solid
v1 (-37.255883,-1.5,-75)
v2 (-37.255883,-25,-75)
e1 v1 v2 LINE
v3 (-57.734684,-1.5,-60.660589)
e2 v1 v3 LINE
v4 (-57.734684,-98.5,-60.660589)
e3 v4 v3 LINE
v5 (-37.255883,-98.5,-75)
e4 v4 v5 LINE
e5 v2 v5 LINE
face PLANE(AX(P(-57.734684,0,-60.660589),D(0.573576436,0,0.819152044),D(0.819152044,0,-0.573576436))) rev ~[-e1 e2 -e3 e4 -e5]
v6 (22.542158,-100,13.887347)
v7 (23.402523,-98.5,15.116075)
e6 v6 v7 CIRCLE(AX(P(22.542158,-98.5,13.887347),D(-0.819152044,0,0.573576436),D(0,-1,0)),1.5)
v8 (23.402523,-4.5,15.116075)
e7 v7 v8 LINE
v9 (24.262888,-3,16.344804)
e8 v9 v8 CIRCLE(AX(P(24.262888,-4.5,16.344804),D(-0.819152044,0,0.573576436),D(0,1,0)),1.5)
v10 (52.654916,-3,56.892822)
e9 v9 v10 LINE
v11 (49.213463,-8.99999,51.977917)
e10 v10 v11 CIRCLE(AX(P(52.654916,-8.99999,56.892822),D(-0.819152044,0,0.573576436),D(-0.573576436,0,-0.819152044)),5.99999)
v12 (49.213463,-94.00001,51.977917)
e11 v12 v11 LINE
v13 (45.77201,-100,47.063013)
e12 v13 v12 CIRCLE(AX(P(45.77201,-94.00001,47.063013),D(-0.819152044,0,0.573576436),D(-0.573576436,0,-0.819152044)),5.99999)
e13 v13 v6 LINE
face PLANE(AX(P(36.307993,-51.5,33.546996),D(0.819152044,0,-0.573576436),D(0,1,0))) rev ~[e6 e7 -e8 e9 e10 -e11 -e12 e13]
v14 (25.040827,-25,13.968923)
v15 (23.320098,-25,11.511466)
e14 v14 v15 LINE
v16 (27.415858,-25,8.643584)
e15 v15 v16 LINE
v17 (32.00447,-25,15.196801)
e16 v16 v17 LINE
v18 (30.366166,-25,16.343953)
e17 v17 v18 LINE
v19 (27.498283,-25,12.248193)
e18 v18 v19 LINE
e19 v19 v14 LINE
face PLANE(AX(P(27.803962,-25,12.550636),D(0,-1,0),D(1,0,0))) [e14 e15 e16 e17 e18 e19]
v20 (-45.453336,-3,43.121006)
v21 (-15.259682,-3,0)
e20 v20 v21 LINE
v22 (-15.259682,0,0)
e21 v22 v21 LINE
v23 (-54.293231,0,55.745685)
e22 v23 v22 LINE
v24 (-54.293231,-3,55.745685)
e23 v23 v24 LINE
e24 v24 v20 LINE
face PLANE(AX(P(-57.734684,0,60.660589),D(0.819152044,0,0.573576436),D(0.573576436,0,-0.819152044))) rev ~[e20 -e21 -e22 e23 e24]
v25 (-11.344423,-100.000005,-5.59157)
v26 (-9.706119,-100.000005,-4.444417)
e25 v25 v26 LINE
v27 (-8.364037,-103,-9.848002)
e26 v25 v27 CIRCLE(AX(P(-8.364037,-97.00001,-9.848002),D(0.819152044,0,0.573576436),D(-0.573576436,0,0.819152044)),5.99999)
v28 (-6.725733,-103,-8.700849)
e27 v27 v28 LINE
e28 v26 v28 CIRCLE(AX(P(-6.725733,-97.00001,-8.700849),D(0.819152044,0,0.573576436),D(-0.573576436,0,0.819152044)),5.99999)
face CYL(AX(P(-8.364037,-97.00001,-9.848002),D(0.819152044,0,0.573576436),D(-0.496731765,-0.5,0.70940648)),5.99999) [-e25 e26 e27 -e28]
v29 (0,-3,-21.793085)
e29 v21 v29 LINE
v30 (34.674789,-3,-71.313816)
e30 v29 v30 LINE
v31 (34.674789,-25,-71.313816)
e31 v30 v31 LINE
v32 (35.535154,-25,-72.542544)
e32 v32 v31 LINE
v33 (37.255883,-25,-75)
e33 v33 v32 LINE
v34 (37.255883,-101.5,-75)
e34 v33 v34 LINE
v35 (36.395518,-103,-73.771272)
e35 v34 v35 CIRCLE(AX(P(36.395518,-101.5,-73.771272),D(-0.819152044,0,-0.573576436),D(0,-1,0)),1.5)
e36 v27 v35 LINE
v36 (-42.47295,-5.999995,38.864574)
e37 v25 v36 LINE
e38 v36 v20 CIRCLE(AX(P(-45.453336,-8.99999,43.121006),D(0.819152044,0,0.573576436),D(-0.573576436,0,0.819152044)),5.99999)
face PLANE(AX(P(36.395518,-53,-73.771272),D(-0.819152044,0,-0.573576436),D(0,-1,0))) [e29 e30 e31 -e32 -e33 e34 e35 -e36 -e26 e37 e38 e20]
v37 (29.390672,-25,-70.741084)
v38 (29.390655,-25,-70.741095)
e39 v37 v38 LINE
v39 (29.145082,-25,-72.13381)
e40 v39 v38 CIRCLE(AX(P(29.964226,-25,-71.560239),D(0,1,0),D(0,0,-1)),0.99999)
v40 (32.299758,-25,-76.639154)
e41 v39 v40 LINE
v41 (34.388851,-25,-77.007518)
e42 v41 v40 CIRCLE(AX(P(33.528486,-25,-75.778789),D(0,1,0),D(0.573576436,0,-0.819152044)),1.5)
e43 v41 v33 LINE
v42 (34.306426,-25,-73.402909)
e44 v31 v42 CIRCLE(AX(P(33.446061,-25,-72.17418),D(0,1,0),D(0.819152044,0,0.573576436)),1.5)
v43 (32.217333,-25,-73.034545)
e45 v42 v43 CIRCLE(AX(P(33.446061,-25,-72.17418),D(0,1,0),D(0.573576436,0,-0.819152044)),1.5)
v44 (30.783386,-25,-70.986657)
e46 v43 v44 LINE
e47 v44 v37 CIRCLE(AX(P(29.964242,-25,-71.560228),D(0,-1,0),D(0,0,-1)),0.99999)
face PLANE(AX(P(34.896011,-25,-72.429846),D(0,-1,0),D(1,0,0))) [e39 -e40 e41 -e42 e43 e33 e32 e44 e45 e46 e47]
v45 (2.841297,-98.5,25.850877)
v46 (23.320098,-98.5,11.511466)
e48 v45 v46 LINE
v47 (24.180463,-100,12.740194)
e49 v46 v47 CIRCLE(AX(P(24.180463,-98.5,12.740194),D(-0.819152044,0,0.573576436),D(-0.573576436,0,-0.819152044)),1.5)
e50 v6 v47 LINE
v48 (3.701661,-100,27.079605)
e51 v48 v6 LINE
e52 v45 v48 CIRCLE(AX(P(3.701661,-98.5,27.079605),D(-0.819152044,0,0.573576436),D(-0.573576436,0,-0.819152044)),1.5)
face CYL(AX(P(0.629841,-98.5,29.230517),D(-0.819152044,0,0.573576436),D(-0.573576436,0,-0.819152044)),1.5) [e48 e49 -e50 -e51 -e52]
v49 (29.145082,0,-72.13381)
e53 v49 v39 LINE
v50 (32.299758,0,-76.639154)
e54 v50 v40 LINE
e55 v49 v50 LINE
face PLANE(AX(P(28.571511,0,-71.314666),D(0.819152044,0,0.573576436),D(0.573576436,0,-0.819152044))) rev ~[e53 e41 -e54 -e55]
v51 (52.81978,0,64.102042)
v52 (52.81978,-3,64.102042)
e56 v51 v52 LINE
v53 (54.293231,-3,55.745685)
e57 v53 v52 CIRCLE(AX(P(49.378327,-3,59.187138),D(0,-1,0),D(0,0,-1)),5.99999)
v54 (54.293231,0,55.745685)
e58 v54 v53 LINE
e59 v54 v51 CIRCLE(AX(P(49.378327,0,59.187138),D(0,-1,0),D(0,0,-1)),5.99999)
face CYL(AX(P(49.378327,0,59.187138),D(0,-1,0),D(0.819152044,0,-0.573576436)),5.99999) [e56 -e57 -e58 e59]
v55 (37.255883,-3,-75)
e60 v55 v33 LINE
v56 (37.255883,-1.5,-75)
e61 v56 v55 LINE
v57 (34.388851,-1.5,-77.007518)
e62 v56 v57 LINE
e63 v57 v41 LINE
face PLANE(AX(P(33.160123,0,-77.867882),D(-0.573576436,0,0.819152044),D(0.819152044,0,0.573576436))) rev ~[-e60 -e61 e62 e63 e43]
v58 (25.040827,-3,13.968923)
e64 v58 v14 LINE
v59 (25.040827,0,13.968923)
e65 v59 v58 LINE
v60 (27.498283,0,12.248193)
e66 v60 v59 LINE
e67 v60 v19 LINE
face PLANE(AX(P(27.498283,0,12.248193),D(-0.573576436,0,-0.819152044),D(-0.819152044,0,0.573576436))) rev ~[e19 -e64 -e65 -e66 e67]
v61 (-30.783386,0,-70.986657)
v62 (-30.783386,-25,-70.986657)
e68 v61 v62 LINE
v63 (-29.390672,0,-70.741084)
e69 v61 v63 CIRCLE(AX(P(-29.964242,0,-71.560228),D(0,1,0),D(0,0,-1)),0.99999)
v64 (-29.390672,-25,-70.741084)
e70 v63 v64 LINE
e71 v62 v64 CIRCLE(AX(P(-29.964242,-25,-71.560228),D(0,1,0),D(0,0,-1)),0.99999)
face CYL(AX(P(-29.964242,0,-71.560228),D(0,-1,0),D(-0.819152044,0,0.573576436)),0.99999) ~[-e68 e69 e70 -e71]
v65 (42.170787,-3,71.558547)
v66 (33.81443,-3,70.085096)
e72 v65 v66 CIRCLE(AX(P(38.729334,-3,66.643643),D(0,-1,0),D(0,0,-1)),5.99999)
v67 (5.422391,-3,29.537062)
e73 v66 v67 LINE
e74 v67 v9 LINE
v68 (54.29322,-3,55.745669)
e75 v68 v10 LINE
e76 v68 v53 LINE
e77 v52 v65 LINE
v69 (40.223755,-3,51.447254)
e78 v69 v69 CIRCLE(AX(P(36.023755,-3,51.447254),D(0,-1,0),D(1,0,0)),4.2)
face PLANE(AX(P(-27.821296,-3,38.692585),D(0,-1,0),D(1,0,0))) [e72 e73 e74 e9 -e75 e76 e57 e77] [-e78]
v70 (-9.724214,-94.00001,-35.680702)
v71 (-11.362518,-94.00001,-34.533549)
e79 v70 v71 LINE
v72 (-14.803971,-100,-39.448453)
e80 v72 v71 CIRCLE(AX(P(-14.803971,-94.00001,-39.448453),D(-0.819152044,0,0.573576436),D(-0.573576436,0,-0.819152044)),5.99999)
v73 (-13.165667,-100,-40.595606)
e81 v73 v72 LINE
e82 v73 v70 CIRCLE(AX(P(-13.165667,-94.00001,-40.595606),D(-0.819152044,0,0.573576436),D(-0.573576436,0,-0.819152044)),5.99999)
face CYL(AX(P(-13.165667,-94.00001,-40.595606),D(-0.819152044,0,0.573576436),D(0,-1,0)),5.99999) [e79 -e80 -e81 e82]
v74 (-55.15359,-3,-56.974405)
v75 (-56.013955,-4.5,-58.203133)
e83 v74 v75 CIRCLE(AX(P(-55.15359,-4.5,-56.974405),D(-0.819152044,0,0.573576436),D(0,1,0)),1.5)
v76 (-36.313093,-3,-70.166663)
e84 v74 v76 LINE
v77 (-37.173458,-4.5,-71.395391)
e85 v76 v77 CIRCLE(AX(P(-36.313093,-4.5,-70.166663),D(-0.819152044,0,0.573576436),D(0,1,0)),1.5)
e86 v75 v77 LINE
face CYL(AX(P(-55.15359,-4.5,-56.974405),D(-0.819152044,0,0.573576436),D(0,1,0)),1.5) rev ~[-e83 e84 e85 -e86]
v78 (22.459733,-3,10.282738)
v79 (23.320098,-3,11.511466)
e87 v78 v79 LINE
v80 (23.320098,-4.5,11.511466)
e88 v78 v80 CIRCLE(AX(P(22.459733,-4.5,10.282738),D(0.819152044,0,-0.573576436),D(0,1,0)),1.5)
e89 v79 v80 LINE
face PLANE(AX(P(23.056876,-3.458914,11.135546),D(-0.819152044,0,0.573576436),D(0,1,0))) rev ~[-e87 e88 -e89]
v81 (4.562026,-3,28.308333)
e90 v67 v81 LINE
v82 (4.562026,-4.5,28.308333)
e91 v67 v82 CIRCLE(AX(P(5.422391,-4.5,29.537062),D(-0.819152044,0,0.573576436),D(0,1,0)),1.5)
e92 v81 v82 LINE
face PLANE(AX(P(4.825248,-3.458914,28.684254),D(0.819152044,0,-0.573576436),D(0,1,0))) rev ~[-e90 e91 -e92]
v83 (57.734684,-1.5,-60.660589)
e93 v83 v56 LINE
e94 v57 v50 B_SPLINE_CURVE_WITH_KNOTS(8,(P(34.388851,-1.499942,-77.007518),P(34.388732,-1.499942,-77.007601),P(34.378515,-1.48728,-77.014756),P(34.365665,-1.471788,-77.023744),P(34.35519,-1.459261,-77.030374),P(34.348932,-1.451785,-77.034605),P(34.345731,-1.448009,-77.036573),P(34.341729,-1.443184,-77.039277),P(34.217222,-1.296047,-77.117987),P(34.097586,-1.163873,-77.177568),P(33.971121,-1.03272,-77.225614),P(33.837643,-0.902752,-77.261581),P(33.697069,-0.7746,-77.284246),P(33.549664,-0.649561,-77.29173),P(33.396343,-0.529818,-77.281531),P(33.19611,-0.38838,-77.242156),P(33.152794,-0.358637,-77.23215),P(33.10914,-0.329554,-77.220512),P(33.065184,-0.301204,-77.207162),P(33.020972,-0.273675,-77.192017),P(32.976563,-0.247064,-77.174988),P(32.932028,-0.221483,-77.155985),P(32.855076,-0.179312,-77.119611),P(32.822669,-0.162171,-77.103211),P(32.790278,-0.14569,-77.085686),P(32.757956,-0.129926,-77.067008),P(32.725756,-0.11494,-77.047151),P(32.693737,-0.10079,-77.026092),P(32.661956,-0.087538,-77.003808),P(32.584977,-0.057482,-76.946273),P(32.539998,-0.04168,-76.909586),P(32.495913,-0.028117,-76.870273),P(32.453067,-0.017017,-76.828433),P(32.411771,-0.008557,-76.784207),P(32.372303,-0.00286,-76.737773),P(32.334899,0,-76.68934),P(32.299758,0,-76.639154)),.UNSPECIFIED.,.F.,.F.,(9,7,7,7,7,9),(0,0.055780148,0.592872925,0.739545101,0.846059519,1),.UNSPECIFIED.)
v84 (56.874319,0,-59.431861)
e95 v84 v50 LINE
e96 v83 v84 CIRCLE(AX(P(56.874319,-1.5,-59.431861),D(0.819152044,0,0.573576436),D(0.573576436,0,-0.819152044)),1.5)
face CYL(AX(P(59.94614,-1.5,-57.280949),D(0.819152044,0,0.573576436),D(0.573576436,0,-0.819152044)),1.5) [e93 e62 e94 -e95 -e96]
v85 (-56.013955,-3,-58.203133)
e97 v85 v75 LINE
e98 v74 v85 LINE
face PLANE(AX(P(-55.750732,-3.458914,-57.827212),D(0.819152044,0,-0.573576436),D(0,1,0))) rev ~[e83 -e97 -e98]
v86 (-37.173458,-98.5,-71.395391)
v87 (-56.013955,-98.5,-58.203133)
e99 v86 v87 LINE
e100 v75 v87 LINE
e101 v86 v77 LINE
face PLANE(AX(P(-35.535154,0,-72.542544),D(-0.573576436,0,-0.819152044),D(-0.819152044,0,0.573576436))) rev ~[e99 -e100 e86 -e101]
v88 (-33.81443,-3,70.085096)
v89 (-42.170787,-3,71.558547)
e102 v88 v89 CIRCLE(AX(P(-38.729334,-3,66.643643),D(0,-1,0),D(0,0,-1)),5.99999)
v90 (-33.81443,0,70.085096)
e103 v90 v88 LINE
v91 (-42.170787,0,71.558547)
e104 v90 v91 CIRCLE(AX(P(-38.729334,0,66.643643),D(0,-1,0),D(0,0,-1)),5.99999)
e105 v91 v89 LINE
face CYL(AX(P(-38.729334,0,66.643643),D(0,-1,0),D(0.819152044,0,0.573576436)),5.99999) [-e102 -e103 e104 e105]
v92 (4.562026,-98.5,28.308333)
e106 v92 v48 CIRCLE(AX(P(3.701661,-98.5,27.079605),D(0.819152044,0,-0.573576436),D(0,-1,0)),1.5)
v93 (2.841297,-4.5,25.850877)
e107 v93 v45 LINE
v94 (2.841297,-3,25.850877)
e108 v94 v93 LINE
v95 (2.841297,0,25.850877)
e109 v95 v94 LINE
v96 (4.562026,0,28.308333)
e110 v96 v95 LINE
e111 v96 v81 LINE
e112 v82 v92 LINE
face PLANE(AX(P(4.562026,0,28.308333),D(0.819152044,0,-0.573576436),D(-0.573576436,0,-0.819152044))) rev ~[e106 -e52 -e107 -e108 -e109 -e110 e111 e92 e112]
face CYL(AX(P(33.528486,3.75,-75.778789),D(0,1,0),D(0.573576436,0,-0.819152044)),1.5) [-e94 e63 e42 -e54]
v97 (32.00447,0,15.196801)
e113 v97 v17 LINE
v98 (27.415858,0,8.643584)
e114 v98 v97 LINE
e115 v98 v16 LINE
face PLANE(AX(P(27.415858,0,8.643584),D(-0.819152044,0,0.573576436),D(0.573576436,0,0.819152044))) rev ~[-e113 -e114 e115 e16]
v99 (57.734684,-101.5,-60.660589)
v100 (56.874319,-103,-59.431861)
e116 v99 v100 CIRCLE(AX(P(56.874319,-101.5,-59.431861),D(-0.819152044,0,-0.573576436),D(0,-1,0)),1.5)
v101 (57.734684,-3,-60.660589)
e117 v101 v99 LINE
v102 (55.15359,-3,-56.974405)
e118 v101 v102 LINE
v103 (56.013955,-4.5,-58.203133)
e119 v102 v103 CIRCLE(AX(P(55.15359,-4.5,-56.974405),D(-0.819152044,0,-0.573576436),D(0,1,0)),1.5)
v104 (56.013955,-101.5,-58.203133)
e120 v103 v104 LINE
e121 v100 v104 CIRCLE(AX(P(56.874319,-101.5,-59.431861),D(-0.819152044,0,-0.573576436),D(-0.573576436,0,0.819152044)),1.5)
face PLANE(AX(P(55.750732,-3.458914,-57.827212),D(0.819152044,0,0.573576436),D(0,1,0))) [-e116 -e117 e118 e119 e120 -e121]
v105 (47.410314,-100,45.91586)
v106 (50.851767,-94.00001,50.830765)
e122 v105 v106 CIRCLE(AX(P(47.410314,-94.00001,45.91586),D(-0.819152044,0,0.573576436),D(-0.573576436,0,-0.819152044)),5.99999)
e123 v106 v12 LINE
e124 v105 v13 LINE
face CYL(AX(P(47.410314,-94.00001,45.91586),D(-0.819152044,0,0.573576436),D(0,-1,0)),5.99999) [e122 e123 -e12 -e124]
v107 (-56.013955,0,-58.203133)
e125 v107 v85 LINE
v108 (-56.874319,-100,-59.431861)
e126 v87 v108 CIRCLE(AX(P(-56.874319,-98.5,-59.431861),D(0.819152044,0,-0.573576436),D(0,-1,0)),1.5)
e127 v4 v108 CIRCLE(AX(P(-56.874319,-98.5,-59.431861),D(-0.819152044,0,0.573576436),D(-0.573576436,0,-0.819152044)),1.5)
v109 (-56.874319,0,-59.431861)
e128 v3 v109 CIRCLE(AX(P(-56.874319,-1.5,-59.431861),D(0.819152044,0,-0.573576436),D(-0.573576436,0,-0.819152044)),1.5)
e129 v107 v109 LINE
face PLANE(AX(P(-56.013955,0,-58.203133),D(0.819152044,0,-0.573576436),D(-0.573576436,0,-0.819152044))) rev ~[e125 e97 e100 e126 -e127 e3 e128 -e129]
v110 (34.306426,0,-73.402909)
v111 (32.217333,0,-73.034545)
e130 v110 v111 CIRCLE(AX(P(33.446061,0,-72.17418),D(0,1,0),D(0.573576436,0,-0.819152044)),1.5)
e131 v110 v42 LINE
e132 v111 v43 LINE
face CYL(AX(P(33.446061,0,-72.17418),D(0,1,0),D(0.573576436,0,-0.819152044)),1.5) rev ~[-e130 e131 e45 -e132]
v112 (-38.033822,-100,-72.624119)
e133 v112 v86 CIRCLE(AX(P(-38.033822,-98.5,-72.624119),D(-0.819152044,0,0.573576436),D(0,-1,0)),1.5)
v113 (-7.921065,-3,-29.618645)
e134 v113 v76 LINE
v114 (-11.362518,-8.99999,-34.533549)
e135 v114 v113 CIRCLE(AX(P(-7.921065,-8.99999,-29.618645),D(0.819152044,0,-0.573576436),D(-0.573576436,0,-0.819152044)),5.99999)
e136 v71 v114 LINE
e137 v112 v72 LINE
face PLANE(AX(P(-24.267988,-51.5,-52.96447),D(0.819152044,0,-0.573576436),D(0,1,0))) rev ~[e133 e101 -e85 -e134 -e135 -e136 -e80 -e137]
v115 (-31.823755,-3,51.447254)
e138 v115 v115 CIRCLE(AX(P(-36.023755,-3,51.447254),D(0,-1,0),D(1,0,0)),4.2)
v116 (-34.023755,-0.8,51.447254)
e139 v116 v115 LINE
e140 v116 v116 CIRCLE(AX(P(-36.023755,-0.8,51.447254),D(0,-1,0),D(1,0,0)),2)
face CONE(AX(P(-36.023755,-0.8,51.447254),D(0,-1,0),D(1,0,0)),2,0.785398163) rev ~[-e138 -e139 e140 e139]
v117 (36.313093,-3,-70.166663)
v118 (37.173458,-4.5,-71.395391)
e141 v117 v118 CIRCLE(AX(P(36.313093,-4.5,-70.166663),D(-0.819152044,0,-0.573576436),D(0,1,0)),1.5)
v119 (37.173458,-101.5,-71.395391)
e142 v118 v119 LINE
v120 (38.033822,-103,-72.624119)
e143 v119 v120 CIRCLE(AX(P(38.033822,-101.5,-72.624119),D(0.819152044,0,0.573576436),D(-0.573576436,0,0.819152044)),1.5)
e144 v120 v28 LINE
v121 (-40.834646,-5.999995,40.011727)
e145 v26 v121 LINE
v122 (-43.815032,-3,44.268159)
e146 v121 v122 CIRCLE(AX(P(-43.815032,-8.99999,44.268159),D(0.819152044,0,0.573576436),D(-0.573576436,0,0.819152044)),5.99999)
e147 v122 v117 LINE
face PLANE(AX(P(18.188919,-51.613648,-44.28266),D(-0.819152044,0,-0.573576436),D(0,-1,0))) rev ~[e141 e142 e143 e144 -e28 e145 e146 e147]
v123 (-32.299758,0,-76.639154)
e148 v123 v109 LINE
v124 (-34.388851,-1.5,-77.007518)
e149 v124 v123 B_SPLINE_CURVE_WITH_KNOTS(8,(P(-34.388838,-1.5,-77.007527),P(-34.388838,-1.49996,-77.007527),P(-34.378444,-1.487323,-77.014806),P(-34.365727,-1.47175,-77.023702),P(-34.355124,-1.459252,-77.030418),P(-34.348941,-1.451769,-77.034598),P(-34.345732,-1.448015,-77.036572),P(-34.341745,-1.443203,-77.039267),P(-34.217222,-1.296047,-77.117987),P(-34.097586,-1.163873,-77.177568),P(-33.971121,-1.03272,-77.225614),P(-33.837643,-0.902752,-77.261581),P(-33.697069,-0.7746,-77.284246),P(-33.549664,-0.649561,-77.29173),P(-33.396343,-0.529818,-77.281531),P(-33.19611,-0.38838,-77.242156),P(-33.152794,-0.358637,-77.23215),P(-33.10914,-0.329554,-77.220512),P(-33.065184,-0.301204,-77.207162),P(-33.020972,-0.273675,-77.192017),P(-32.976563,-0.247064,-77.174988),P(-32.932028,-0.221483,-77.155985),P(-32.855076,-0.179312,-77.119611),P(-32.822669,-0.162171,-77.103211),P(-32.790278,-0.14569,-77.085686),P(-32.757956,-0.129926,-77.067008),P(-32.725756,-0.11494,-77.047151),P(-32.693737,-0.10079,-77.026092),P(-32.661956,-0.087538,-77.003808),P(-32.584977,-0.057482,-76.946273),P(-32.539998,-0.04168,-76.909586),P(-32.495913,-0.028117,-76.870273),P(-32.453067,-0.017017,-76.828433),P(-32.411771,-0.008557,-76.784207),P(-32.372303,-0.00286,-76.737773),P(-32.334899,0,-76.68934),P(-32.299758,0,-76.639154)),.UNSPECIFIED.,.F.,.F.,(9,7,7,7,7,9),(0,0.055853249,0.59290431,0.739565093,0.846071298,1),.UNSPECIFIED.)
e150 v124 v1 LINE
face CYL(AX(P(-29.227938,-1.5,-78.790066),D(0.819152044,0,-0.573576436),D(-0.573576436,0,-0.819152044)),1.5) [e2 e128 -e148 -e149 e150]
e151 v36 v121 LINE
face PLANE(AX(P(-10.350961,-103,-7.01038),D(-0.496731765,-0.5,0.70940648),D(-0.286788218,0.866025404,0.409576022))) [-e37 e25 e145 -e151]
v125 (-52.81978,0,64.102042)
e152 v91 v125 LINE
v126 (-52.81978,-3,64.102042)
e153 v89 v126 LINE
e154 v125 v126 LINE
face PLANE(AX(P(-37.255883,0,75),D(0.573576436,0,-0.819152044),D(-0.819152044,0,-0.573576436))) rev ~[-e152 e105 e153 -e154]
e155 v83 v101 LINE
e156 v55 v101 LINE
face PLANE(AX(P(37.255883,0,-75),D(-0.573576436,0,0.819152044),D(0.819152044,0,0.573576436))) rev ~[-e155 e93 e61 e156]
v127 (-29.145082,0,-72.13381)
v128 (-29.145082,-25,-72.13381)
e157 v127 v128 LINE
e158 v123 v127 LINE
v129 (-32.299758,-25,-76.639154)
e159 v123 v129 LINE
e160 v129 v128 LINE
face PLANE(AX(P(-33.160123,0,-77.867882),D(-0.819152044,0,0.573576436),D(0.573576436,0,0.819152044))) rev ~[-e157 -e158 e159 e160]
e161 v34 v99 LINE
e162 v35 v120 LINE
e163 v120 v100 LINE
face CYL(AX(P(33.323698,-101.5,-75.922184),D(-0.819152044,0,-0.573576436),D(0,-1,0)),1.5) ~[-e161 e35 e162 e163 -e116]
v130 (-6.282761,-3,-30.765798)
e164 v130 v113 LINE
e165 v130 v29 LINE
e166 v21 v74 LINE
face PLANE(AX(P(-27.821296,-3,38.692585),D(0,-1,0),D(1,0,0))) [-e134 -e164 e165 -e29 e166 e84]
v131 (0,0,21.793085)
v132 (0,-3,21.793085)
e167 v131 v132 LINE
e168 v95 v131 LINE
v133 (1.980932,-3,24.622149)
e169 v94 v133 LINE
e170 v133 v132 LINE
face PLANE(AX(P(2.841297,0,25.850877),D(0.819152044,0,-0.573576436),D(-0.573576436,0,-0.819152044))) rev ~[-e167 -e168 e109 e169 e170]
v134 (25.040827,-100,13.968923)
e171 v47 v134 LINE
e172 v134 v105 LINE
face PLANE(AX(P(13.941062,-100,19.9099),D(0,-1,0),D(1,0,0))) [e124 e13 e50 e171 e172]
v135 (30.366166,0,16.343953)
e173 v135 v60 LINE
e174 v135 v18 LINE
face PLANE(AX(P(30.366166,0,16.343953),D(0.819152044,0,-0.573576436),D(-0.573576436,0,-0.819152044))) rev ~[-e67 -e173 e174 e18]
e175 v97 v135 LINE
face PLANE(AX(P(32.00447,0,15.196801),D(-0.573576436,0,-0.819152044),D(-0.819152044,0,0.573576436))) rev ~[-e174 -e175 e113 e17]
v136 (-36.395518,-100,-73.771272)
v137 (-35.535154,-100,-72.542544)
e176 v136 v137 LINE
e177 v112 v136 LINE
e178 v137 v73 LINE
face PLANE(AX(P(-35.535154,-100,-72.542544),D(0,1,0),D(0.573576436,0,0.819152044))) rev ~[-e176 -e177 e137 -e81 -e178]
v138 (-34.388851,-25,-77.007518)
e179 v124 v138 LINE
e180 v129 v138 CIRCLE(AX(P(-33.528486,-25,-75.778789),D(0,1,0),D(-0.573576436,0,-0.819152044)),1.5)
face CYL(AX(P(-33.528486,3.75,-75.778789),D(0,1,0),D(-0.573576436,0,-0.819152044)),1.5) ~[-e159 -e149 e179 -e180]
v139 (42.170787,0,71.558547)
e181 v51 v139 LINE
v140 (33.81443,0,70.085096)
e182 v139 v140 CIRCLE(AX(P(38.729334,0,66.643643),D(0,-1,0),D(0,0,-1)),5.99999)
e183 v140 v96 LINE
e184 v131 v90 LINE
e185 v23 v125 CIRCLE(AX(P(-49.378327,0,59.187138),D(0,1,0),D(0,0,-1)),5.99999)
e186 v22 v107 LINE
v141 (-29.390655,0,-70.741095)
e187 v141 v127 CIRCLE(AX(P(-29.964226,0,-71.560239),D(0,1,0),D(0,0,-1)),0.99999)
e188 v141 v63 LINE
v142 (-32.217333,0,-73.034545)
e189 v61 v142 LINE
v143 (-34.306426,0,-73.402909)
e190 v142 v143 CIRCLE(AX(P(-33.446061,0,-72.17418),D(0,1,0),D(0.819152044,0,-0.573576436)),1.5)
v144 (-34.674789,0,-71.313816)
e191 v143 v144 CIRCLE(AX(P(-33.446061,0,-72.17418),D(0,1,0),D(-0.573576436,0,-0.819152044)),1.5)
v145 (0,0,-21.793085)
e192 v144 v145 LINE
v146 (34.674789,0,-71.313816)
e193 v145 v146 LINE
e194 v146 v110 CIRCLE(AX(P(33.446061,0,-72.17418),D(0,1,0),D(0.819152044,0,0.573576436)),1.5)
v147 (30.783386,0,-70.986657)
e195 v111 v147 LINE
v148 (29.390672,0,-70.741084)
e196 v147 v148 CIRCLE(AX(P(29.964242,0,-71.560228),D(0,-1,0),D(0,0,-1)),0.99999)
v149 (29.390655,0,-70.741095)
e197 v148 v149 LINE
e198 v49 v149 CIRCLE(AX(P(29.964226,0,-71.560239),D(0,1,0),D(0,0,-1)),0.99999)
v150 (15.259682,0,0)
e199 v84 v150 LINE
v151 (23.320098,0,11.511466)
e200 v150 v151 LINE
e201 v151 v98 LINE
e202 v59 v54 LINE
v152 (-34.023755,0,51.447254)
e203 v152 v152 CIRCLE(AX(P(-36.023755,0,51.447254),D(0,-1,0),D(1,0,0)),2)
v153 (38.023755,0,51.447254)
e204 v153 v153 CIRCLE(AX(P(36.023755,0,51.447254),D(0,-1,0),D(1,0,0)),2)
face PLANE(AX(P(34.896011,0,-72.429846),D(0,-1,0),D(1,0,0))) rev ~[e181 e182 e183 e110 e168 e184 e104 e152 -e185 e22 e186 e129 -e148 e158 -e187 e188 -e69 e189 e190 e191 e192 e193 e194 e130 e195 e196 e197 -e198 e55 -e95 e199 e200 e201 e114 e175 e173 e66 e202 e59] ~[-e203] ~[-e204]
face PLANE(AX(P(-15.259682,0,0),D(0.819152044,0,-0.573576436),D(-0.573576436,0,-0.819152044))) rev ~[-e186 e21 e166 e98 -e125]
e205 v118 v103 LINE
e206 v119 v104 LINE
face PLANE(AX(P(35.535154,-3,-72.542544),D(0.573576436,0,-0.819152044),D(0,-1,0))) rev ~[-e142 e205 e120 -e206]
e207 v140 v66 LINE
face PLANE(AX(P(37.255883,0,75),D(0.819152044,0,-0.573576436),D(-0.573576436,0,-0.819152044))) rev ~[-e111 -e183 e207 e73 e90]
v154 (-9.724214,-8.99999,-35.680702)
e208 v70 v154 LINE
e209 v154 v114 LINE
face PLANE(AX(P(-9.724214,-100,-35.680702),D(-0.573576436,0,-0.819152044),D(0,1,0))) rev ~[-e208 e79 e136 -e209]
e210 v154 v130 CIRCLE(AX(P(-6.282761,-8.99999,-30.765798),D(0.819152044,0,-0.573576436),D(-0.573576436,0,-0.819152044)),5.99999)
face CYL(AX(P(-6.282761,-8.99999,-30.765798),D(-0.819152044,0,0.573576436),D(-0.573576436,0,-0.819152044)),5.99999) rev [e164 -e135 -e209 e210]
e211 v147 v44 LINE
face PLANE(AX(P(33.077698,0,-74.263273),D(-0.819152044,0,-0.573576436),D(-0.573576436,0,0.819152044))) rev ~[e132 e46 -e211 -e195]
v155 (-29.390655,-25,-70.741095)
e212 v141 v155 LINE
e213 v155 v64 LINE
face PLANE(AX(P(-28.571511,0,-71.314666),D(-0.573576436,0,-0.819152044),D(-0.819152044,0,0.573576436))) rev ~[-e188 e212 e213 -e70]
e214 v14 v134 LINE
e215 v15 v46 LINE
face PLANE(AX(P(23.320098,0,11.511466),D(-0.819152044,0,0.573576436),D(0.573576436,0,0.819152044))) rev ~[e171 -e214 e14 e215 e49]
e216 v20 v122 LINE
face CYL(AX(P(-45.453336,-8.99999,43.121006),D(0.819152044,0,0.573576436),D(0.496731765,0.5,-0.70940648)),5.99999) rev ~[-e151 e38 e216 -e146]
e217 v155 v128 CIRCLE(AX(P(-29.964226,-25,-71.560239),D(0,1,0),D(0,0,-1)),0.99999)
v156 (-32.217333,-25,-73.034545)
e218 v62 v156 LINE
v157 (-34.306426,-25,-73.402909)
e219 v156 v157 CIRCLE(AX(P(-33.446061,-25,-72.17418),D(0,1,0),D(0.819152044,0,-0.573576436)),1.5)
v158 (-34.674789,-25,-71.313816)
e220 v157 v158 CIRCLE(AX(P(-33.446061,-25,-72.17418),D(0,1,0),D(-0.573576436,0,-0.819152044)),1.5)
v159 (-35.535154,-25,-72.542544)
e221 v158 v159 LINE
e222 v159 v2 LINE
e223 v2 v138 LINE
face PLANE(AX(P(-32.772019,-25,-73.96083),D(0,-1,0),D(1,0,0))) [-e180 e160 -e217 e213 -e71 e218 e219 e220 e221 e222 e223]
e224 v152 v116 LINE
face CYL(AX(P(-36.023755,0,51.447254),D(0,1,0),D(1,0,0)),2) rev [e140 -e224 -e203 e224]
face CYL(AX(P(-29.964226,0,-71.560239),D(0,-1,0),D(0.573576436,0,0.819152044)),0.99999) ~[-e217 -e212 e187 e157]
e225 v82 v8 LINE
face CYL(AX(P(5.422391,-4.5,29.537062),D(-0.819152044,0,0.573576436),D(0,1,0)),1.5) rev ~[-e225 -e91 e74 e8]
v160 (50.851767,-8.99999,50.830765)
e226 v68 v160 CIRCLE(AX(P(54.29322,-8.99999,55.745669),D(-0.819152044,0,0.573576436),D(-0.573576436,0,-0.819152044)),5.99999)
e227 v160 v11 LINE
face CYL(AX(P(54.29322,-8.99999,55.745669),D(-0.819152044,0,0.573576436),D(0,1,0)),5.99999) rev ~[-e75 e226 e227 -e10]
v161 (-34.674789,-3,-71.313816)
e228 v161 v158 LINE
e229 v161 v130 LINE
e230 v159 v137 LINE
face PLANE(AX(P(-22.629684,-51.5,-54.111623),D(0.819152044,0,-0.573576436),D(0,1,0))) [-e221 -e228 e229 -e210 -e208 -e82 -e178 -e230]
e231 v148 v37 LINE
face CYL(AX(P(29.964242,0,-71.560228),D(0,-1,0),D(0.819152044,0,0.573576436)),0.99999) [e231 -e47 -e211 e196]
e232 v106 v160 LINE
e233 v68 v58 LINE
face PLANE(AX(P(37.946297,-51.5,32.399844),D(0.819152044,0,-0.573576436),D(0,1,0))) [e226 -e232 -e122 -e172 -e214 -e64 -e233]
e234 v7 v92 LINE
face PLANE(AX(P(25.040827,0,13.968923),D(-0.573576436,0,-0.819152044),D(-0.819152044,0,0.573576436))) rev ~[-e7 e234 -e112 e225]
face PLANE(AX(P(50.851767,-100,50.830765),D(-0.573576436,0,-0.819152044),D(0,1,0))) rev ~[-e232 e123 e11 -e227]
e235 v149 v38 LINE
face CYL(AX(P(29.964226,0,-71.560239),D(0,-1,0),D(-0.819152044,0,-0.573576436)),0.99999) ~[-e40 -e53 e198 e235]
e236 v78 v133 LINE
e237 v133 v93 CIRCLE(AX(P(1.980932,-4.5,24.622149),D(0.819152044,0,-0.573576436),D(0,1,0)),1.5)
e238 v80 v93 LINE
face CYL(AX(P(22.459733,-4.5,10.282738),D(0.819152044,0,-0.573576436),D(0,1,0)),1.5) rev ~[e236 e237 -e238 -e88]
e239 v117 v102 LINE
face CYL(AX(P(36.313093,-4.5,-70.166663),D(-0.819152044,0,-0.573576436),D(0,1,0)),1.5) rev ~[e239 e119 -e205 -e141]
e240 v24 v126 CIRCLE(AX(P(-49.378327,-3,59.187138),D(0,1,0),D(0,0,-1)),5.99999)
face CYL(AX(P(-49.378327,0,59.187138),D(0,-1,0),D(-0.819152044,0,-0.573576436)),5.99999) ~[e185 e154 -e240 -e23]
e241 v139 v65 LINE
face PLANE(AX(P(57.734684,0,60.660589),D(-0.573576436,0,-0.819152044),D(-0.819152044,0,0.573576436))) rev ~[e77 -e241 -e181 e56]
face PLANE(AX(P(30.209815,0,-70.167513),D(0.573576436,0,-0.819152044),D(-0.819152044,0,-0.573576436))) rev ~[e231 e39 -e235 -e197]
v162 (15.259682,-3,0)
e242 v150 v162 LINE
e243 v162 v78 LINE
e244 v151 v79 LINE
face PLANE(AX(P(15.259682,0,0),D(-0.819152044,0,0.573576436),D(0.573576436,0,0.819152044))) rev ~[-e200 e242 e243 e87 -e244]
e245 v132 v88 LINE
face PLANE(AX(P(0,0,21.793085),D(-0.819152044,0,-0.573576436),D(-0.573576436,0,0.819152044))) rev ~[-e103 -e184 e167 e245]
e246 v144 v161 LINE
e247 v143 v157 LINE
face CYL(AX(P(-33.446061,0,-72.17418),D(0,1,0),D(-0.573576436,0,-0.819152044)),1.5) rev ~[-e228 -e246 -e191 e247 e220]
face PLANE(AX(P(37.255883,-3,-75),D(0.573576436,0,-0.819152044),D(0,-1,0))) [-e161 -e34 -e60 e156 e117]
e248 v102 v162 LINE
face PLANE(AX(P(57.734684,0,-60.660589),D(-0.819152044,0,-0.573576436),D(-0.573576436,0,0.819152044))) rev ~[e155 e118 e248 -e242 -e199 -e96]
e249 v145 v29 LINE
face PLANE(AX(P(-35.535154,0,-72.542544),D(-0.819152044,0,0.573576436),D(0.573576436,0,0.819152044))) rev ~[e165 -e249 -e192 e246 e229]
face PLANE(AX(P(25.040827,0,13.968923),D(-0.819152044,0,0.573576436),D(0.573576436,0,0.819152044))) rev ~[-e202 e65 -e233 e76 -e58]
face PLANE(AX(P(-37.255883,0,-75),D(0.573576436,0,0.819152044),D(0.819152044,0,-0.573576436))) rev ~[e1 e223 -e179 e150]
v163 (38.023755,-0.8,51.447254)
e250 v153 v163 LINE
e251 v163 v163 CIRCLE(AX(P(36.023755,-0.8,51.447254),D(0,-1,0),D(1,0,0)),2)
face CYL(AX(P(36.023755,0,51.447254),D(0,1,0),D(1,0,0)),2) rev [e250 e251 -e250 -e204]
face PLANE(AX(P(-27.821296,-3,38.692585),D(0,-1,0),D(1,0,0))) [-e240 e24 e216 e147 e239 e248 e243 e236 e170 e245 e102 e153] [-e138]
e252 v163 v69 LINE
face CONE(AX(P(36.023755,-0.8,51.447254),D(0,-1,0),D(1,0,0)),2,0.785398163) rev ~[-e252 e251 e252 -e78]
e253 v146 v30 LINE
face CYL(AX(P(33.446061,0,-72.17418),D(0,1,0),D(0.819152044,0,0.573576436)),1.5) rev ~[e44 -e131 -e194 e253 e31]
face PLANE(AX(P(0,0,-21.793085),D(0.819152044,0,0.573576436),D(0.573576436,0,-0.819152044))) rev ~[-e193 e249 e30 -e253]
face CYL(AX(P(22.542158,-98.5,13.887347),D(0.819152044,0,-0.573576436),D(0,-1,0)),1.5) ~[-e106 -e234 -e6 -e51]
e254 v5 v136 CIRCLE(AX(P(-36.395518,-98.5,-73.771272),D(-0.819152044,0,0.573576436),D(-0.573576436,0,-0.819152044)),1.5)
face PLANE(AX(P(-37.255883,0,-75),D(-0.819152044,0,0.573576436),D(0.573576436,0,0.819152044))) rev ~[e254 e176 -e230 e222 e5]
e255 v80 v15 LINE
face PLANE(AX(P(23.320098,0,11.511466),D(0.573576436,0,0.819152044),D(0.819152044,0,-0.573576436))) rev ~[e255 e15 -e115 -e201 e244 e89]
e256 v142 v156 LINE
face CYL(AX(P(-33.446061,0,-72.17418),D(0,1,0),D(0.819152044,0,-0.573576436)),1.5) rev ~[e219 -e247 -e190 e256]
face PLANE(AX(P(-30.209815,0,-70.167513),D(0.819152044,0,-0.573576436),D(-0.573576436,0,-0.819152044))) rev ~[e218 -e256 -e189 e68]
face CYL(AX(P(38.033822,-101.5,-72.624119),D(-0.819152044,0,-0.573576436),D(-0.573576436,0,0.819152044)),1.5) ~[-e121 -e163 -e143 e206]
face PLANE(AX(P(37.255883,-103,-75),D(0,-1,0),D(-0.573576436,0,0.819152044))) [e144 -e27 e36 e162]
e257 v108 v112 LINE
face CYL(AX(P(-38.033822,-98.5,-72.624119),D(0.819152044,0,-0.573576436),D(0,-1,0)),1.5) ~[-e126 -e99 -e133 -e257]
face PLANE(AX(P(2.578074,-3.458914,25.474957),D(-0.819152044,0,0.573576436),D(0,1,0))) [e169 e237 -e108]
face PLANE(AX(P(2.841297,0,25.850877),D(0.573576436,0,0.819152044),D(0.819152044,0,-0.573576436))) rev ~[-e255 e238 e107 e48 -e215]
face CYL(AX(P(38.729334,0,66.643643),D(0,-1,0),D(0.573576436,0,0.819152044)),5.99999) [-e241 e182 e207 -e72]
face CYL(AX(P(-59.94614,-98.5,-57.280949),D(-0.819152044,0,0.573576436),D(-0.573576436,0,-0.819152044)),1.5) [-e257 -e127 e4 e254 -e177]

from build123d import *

# Parameters (mm, degrees)
F0_R          = 2
F1_DEPTH      = 3
F4_DEPTH      = 2
F3_W          = 100
F3_H          = 3
F5_DEPTH      = 25
F6_DEPTH      = 25
F7_DEPTH      = 100
F9_W          = 97
F9_H          = 45
F10_DEPTH     = 2
F11_R         = 5.99999
F12_T1_DEPTH  = 23
F12_T3_DEPTH  = 25
F12_T5_DEPTH  = 23
F12_T7_DEPTH  = 25
F12_T9_DEPTH  = 32.5
F12_T11_DEPTH = 26.75
F12_T13_DEPTH = 32.5
F12_T15_DEPTH = 26.75
F12_T17_DEPTH = 37.5
F12_T19_DEPTH = 37.5
F12_T21_DEPTH = 32.5
F13_R         = 0.99999
F14_SIZE      = 2.2


# Not quite as in the source:
# - a fillet or chamfer that OpenCascade refuses, or shapes differently, is made with other operations: its cross-section is extruded or revolved along the edge and cut away or added
# - a fillet or chamfer is up to 0.001 mm smaller than in the source, because OpenCascade refuses the exact size
# - a feature names something its author has since deleted; it is built from what else it names


with BuildPart() as f1:
    # F0 (on Front) → F1 (new body)
    with BuildSketch(Plane.XZ):
        Polygon((-15.2596823595, 0), (0, 21.7930849453), (-37.2558830062, 75), (-57.7346841134, 60.6605890912), align=None)
        with Locations((-36.0237548328, 51.4472536598)):
            Circle(F0_R, mode=Mode.SUBTRACT)
        Polygon((0, -21.7930849453), (15.2596823595, 0), (0, 21.7930849453), (-15.2596823595, 0), align=None)
        Polygon((25.0408272414, 13.9689225668), (57.7346841134, 60.6605890912), (37.2558830062, 75), (4.5620261342, 28.3083334755), align=None)
        with Locations((36.0237548328, 51.4472536598)):
            Circle(F0_R, mode=Mode.SUBTRACT)
        Polygon((15.2596823595, 0), (23.3200979324, 11.5114664339), (2.8412968251, 25.8508773427), (0, 21.7930849453), align=None)
        Polygon((23.3200979324, 11.5114664339), (25.0408272414, 13.9689225668), (4.5620261342, 28.3083334755), (2.8412968251, 25.8508773427), align=None)
        Polygon((-35.5351536972, -72.5425438671), (0, -21.7930849453), (-15.2596823595, 0), (-56.0139548044, -58.2031329584), align=None)
        Polygon((57.7346841134, -60.6605890912), (15.2596823595, 0), (0, -21.7930849453), (35.5351536972, -72.5425438671), (37.2558830062, -75), align=None)
        Polygon((-37.2558830062, -75), (-35.5351536972, -72.5425438671), (-56.0139548044, -58.2031329584), (-57.7346841134, -60.6605890912), align=None)
    extrude(amount=F1_DEPTH)

    # F3 (on offset) → F4 (join)
    with BuildSketch(Plane(origin=(-10.2394005536, 0, -7.1697054544), x_dir=(0, -1, 0), z_dir=(-0.8191520443, 0, -0.5735764364))):
        Polygon((3, -79.8054999295), (103, -79.8054999295), (103, 0.1945000705), (83, 0.1945000705), (90.1471648731, -3.9319174929), (90.1471648731, -52.514305784), (48.0735824366, -76.8054999295), (6, -52.514305784), (6, -3.9319174929), (13.1471648731, 0.1945000705), (3, 0.1945000705), align=None)
        Polygon((83, 0.1945000705), (103, 0.1945000705), (3, 57.9295269895), (3, 0.1945000705), (13.1471648731, 0.1945000705), (48.0735824366, 20.3592766526), align=None)
        Polygon((90.1471648731, -3.9319174929), (83, 0.1945000705), (13.1471648731, 0.1945000705), (6, -3.9319174929), (6, -52.514305784), (48.0735824366, -76.8054999295), (90.1471648731, -52.514305784), align=None)
        Polygon((13.1471648731, 0.1945000705), (83, 0.1945000705), (48.0735824366, 20.3592766526), align=None)
    extrude(amount=-F4_DEPTH)

    # F3 (on offset) → F5 (join)
    with BuildSketch(Plane(origin=(-10.2394005536, 0, -7.1697054544), x_dir=(0, -1, 0), z_dir=(-0.8191520443, 0, -0.5735764364))):
        with Locations((53, -81.3054999295)):
            Rectangle(F3_W, F3_H)
    extrude(amount=-F5_DEPTH)

    # F0 (on Front) → F6 (join)
    with BuildSketch(Plane.XZ):
        Polygon((-33.0776975643, -74.2632731762), (-35.5351536972, -72.5425438671), (-37.2558830062, -75), (-33.1601227848, -77.8678821818), (-28.571511294, -71.3146658274), (-30.2098153825, -70.1675129547), align=None)
        Polygon((37.2558830062, -75), (35.5351536972, -72.5425438671), (33.0776975643, -74.2632731762), (30.2098153825, -70.1675129547), (28.571511294, -71.3146658274), (33.1601227848, -77.8678821818), align=None)
        Polygon((27.4982833743, 12.2481932577), (25.0408272414, 13.9689225668), (23.3200979324, 11.5114664339), (27.4158581538, 8.6435842521), (32.0044696446, 15.1968006064), (30.366165556, 16.3439534791), align=None)
    extrude(amount=F6_DEPTH)

    # F0 (on Front) → F7 (join)
    with BuildSketch(Plane.XZ):
        Polygon((-37.2558830062, -75), (-35.5351536972, -72.5425438671), (-56.0139548044, -58.2031329584), (-57.7346841134, -60.6605890912), align=None)
        Polygon((23.3200979324, 11.5114664339), (25.0408272414, 13.9689225668), (4.5620261342, 28.3083334755), (2.8412968251, 25.8508773427), align=None)
    extrude(amount=F7_DEPTH)

    # F9 (on offset) → F10 (join)
    with BuildSketch(Plane(origin=(10.2394005536, 0, -7.1697054544), x_dir=(0, 1, 0), z_dir=(0.8191520443, 0, -0.5735764364))):
        with Locations((-51.5, -57.3054999295)):
            Rectangle(F9_W, F9_H)
        Polygon((-94, -57.3054999295), (-84.4737205584, -40.8054999295), (-65.4211616751, -40.8054999295), (-55.8948822335, -57.3054999295), (-65.4211616751, -73.8054999295), (-84.4737205584, -73.8054999295), align=None, mode=Mode.SUBTRACT)
        Polygon((-9, -57.3054999295), (-18.5262794416, -73.8054999295), (-37.5788383249, -73.8054999295), (-47.1051177665, -57.3054999295), (-37.5788383249, -40.8054999295), (-18.5262794416, -40.8054999295), align=None, mode=Mode.SUBTRACT)
        with Locations((-51.5, 48.3054999295)):
            Rectangle(F9_W, F9_H)
        Polygon((-55.8948822335, 48.3054999295), (-65.4211616751, 31.8054999295), (-84.4737205584, 31.8054999295), (-94, 48.3054999295), (-84.4737205584, 64.8054999295), (-65.4211616751, 64.8054999295), align=None, mode=Mode.SUBTRACT)
        Polygon((-9, 48.3054999295), (-18.5262794416, 31.8054999295), (-37.5788383249, 31.8054999295), (-47.1051177665, 48.3054999295), (-37.5788383249, 64.8054999295), (-18.5262794416, 64.8054999295), align=None, mode=Mode.SUBTRACT)
        Polygon((-84.4737205584, 31.8054999295), (-65.4211616751, 31.8054999295), (-55.8948822335, 48.3054999295), (-65.4211616751, 64.8054999295), (-84.4737205584, 64.8054999295), (-94, 48.3054999295), align=None)
        Polygon((-37.5788383249, 31.8054999295), (-18.5262794416, 31.8054999295), (-9, 48.3054999295), (-18.5262794416, 64.8054999295), (-37.5788383249, 64.8054999295), (-47.1051177665, 48.3054999295), align=None)
        Polygon((-65.4211616751, -40.8054999295), (-84.4737205584, -40.8054999295), (-94, -57.3054999295), (-84.4737205584, -73.8054999295), (-65.4211616751, -73.8054999295), (-55.8948822335, -57.3054999295), align=None)
        Polygon((-37.5788383249, -73.8054999295), (-18.5262794416, -73.8054999295), (-9, -57.3054999295), (-18.5262794416, -40.8054999295), (-37.5788383249, -40.8054999295), (-47.1051177665, -57.3054999295), align=None)
    extrude(amount=-F10_DEPTH)

    # F11 (radius 6 in the source; OpenCascade refuses exactly that, so slightly less here)
    f11_edges = [f1.edges().sort_by_distance(p)[0] for p in [
        (-10.543366, -3, -35.107125),
        (-10.543366, -100, -35.107125),
        (50.032615, -100, 51.404341),
        (50.032615, -3, 51.404341),
        (-42.64726, -3, 40.856961),
        (-9.531809, -103, -6.436804),
        (-57.734684, -1.5, 60.660589),
        (-37.255883, -1.5, 75),
        (37.255883, -1.5, 75),
        (57.734684, -1.5, 60.660589),
    ]]
    fillet(f11_edges, radius=F11_R)

    # F12: fillet of radius 1.5 on 18 edges, made by hand

    # F12_s2 → F12_t1 (join)
    with BuildSketch(Plane(origin=(-10.2394005536, 0, 7.1697054544), x_dir=(0, 1, 0), z_dir=(0.8191520443, 0, -0.5735764364))):
        with BuildLine():
            ThreePointArc((-3, 27.3054999295), (-3.4393398282, 26.2448397577), (-4.5, 25.8054999295))
            Line((-4.5, 25.8054999295), (-3, 25.8054999295))
            Line((-3, 25.8054999295), (-3, 27.3054999295))
        make_face()
        with BuildLine():
            ThreePointArc((-3, -78.3054999295), (-3.4393398282, -79.3661601013), (-4.5, -79.8054999295))
            Line((-4.5, -79.8054999295), (-3, -79.8054999295))
            Line((-3, -79.8054999295), (-3, -78.3054999295))
        make_face()
    extrude(amount=F12_T1_DEPTH)

    # F12_s4 → F12_t3 (join)
    with BuildSketch(Plane(origin=(10.2394005536, 0, -7.1697054544), x_dir=(0, 1, 0), z_dir=(-0.8191520443, 0, 0.5735764364))):
        with BuildLine():
            ThreePointArc((-3, -21.3054999295), (-3.4393398282, -22.3661601013), (-4.5, -22.8054999295))
            Line((-4.5, -22.8054999295), (-3, -22.8054999295))
            Line((-3, -22.8054999295), (-3, -21.3054999295))
        make_face()
    extrude(amount=F12_T3_DEPTH)

    # F12_s6 → F12_t5 (join)
    with BuildSketch(Plane(origin=(-8.601096465, 0, -6.0225525817), x_dir=(0, 1, 0), z_dir=(0.8191520443, 0, 0.5735764364))):
        with BuildLine():
            ThreePointArc((-3, -78.3054999295), (-3.4393398282, -79.3661601013), (-4.5, -79.8054999295))
            Line((-4.5, -79.8054999295), (-3, -79.8054999295))
            Line((-3, -79.8054999295), (-3, -78.3054999295))
        make_face()
    extrude(amount=F12_T5_DEPTH)

    # F12_s8 → F12_t7 (join)
    with BuildSketch(Plane.XZ):
        with BuildLine():
            ThreePointArc((34.6747890426, -71.3138158007), (34.9232726057, -72.4346527217), (34.3064256307, -73.4029085217))
            Line((34.3064256307, -73.4029085217), (35.5351536972, -72.5425438671))
            Line((35.5351536972, -72.5425438671), (34.6747890426, -71.3138158007))
        make_face()
        with BuildLine():
            ThreePointArc((-32.2173329098, -73.0345451098), (-33.1855887097, -73.6513920847), (-34.3064256307, -73.4029085217))
            Line((-34.3064256307, -73.4029085217), (-33.0776975643, -74.2632731762))
            Line((-33.0776975643, -74.2632731762), (-32.2173329098, -73.0345451098))
        make_face()
        with BuildLine():
            ThreePointArc((-34.3064256307, -73.4029085217), (-34.9232726057, -72.4346527217), (-34.6747890426, -71.3138158007))
            Line((-34.6747890426, -71.3138158007), (-35.5351536972, -72.5425438671))
            Line((-35.5351536972, -72.5425438671), (-34.3064256307, -73.4029085217))
        make_face()
        with BuildLine():
            ThreePointArc((34.3064256307, -73.4029085217), (33.1855887097, -73.6513920847), (32.2173329098, -73.0345451098))
            Line((32.2173329098, -73.0345451098), (33.0776975643, -74.2632731762))
            Line((33.0776975643, -74.2632731762), (34.3064256307, -73.4029085217))
        make_face()
    extrude(amount=F12_T7_DEPTH)

    # F12_s10 → F12_t9 (cut)
    with BuildSketch(Plane(origin=(-13.3112207197, 0, 9.3206170907), x_dir=(0, 1, 0), z_dir=(0.8191520443, 0, -0.5735764364))):
        with BuildLine():
            ThreePointArc((-98.5, -82.8054999295), (-99.5606601718, -82.3661601013), (-100, -81.3054999295))
            Line((-100, -81.3054999295), (-100, -82.8054999295))
            Line((-100, -82.8054999295), (-98.5, -82.8054999295))
        make_face()
        with BuildLine():
            ThreePointArc((-98.5, 22.8054999295), (-99.5606601718, 23.2448397577), (-100, 24.3054999295))
            Line((-100, 24.3054999295), (-100, 22.8054999295))
            Line((-100, 22.8054999295), (-98.5, 22.8054999295))
        make_face()
    extrude(amount=F12_T9_DEPTH, mode=Mode.SUBTRACT)

    # F12_s12 → F12_t11 (cut)
    with BuildSketch(Plane(origin=(8.601096465, 0, -6.0225525817), x_dir=(0, 1, 0), z_dir=(-0.8191520443, 0, 0.5735764364))):
        with BuildLine():
            ThreePointArc((-100, -24.3054999295), (-99.5606601718, -25.3661601013), (-98.5, -25.8054999295))
            Line((-98.5, -25.8054999295), (-100, -25.8054999295))
            Line((-100, -25.8054999295), (-100, -24.3054999295))
        make_face()
        with BuildLine():
            ThreePointArc((-100, 81.3054999295), (-99.5606601718, 80.2448397577), (-98.5, 79.8054999295))
            Line((-98.5, 79.8054999295), (-100, 79.8054999295))
            Line((-100, 79.8054999295), (-100, 81.3054999295))
        make_face()
    extrude(amount=F12_T11_DEPTH, mode=Mode.SUBTRACT)

    # F12_s14 → F12_t13 (cut)
    with BuildSketch(Plane(origin=(-13.3112207197, 0, -9.3206170907), x_dir=(0, 1, 0), z_dir=(0.8191520443, 0, 0.5735764364))):
        with BuildLine():
            ThreePointArc((-103, -81.3054999295), (-102.5606601718, -82.3661601013), (-101.5, -82.8054999295))
            Line((-101.5, -82.8054999295), (-103, -82.8054999295))
            Line((-103, -82.8054999295), (-103, -81.3054999295))
        make_face()
    extrude(amount=F12_T13_DEPTH, mode=Mode.SUBTRACT)

    # F12_s16 → F12_t15 (cut)
    with BuildSketch(Plane(origin=(-8.601096465, 0, -6.0225525817), x_dir=(0, 1, 0), z_dir=(0.8191520443, 0, 0.5735764364))):
        with BuildLine():
            ThreePointArc((-101.5, -79.8054999295), (-102.5606601718, -80.2448397577), (-103, -81.3054999295))
            Line((-103, -81.3054999295), (-103, -79.8054999295))
            Line((-103, -79.8054999295), (-101.5, -79.8054999295))
        make_face()
    extrude(amount=F12_T15_DEPTH, mode=Mode.SUBTRACT)

    # F12_s18 → F12_t17 (cut)
    with BuildSketch(Plane(origin=(17.4069809411, 0, -12.1884992725), x_dir=(0, 1, 0), z_dir=(-0.8191520443, 0, 0.5735764364))):
        with BuildLine():
            ThreePointArc((-1.5, 82.8054999295), (-0.4393398282, 82.3661601013), (0, 81.3054999295))
            Line((0, 81.3054999295), (0, 82.8054999295))
            Line((0, 82.8054999295), (-1.5, 82.8054999295))
        make_face()
    extrude(amount=F12_T17_DEPTH, mode=Mode.SUBTRACT)

    # F12_s20 → F12_t19 (cut)
    with BuildSketch(Plane(origin=(13.3112207197, 0, 9.3206170907), x_dir=(0, 1, 0), z_dir=(-0.8191520443, 0, -0.5735764364))):
        with BuildLine():
            ThreePointArc((-1.5, 82.8054999295), (-0.4393398282, 82.3661601013), (0, 81.3054999295))
            Line((0, 81.3054999295), (0, 82.8054999295))
            Line((0, 82.8054999295), (-1.5, 82.8054999295))
        make_face()
    extrude(amount=F12_T19_DEPTH, mode=Mode.SUBTRACT)

    # F12_s22 → F12_t21 (cut)
    with BuildSketch(Plane.XZ.offset(-3.75)):
        with BuildLine():
            ThreePointArc((34.3888508512, -77.0075175272), (33.2680139302, -77.2560010903), (32.2997581302, -76.6391541153))
            Line((32.2997581302, -76.6391541153), (33.1601227848, -77.8678821818))
            Line((33.1601227848, -77.8678821818), (34.3888508512, -77.0075175272))
        make_face()
        with BuildLine():
            ThreePointArc((-34.3888508512, -77.0075175272), (-33.2680139302, -77.2560010903), (-32.2997581302, -76.6391541153))
            Line((-32.2997581302, -76.6391541153), (-33.1601227848, -77.8678821818))
            Line((-33.1601227848, -77.8678821818), (-34.3888508512, -77.0075175272))
        make_face()
    extrude(amount=F12_T21_DEPTH, mode=Mode.SUBTRACT)

    # F13 (radius 1 in the source; OpenCascade refuses exactly that, so slightly less here)
    f13_edges = [f1.edges().sort_by_distance(p)[0] for p in [
        (-28.571511, -12.5, -71.314666),
        (28.571511, -12.5, -71.314666),
        (-30.209815, -12.5, -70.167513),
        (30.209815, -12.5, -70.167513),
    ]]
    fillet(f13_edges, radius=F13_R)

    # F14
    f14_edges = [f1.edges().sort_by_distance(p)[0] for p in [
        (-38.023755, -3, 51.447254),
        (34.023755, -3, 51.447254),
    ]]
    chamfer(f14_edges, length=F14_SIZE)


solid = f1.part
